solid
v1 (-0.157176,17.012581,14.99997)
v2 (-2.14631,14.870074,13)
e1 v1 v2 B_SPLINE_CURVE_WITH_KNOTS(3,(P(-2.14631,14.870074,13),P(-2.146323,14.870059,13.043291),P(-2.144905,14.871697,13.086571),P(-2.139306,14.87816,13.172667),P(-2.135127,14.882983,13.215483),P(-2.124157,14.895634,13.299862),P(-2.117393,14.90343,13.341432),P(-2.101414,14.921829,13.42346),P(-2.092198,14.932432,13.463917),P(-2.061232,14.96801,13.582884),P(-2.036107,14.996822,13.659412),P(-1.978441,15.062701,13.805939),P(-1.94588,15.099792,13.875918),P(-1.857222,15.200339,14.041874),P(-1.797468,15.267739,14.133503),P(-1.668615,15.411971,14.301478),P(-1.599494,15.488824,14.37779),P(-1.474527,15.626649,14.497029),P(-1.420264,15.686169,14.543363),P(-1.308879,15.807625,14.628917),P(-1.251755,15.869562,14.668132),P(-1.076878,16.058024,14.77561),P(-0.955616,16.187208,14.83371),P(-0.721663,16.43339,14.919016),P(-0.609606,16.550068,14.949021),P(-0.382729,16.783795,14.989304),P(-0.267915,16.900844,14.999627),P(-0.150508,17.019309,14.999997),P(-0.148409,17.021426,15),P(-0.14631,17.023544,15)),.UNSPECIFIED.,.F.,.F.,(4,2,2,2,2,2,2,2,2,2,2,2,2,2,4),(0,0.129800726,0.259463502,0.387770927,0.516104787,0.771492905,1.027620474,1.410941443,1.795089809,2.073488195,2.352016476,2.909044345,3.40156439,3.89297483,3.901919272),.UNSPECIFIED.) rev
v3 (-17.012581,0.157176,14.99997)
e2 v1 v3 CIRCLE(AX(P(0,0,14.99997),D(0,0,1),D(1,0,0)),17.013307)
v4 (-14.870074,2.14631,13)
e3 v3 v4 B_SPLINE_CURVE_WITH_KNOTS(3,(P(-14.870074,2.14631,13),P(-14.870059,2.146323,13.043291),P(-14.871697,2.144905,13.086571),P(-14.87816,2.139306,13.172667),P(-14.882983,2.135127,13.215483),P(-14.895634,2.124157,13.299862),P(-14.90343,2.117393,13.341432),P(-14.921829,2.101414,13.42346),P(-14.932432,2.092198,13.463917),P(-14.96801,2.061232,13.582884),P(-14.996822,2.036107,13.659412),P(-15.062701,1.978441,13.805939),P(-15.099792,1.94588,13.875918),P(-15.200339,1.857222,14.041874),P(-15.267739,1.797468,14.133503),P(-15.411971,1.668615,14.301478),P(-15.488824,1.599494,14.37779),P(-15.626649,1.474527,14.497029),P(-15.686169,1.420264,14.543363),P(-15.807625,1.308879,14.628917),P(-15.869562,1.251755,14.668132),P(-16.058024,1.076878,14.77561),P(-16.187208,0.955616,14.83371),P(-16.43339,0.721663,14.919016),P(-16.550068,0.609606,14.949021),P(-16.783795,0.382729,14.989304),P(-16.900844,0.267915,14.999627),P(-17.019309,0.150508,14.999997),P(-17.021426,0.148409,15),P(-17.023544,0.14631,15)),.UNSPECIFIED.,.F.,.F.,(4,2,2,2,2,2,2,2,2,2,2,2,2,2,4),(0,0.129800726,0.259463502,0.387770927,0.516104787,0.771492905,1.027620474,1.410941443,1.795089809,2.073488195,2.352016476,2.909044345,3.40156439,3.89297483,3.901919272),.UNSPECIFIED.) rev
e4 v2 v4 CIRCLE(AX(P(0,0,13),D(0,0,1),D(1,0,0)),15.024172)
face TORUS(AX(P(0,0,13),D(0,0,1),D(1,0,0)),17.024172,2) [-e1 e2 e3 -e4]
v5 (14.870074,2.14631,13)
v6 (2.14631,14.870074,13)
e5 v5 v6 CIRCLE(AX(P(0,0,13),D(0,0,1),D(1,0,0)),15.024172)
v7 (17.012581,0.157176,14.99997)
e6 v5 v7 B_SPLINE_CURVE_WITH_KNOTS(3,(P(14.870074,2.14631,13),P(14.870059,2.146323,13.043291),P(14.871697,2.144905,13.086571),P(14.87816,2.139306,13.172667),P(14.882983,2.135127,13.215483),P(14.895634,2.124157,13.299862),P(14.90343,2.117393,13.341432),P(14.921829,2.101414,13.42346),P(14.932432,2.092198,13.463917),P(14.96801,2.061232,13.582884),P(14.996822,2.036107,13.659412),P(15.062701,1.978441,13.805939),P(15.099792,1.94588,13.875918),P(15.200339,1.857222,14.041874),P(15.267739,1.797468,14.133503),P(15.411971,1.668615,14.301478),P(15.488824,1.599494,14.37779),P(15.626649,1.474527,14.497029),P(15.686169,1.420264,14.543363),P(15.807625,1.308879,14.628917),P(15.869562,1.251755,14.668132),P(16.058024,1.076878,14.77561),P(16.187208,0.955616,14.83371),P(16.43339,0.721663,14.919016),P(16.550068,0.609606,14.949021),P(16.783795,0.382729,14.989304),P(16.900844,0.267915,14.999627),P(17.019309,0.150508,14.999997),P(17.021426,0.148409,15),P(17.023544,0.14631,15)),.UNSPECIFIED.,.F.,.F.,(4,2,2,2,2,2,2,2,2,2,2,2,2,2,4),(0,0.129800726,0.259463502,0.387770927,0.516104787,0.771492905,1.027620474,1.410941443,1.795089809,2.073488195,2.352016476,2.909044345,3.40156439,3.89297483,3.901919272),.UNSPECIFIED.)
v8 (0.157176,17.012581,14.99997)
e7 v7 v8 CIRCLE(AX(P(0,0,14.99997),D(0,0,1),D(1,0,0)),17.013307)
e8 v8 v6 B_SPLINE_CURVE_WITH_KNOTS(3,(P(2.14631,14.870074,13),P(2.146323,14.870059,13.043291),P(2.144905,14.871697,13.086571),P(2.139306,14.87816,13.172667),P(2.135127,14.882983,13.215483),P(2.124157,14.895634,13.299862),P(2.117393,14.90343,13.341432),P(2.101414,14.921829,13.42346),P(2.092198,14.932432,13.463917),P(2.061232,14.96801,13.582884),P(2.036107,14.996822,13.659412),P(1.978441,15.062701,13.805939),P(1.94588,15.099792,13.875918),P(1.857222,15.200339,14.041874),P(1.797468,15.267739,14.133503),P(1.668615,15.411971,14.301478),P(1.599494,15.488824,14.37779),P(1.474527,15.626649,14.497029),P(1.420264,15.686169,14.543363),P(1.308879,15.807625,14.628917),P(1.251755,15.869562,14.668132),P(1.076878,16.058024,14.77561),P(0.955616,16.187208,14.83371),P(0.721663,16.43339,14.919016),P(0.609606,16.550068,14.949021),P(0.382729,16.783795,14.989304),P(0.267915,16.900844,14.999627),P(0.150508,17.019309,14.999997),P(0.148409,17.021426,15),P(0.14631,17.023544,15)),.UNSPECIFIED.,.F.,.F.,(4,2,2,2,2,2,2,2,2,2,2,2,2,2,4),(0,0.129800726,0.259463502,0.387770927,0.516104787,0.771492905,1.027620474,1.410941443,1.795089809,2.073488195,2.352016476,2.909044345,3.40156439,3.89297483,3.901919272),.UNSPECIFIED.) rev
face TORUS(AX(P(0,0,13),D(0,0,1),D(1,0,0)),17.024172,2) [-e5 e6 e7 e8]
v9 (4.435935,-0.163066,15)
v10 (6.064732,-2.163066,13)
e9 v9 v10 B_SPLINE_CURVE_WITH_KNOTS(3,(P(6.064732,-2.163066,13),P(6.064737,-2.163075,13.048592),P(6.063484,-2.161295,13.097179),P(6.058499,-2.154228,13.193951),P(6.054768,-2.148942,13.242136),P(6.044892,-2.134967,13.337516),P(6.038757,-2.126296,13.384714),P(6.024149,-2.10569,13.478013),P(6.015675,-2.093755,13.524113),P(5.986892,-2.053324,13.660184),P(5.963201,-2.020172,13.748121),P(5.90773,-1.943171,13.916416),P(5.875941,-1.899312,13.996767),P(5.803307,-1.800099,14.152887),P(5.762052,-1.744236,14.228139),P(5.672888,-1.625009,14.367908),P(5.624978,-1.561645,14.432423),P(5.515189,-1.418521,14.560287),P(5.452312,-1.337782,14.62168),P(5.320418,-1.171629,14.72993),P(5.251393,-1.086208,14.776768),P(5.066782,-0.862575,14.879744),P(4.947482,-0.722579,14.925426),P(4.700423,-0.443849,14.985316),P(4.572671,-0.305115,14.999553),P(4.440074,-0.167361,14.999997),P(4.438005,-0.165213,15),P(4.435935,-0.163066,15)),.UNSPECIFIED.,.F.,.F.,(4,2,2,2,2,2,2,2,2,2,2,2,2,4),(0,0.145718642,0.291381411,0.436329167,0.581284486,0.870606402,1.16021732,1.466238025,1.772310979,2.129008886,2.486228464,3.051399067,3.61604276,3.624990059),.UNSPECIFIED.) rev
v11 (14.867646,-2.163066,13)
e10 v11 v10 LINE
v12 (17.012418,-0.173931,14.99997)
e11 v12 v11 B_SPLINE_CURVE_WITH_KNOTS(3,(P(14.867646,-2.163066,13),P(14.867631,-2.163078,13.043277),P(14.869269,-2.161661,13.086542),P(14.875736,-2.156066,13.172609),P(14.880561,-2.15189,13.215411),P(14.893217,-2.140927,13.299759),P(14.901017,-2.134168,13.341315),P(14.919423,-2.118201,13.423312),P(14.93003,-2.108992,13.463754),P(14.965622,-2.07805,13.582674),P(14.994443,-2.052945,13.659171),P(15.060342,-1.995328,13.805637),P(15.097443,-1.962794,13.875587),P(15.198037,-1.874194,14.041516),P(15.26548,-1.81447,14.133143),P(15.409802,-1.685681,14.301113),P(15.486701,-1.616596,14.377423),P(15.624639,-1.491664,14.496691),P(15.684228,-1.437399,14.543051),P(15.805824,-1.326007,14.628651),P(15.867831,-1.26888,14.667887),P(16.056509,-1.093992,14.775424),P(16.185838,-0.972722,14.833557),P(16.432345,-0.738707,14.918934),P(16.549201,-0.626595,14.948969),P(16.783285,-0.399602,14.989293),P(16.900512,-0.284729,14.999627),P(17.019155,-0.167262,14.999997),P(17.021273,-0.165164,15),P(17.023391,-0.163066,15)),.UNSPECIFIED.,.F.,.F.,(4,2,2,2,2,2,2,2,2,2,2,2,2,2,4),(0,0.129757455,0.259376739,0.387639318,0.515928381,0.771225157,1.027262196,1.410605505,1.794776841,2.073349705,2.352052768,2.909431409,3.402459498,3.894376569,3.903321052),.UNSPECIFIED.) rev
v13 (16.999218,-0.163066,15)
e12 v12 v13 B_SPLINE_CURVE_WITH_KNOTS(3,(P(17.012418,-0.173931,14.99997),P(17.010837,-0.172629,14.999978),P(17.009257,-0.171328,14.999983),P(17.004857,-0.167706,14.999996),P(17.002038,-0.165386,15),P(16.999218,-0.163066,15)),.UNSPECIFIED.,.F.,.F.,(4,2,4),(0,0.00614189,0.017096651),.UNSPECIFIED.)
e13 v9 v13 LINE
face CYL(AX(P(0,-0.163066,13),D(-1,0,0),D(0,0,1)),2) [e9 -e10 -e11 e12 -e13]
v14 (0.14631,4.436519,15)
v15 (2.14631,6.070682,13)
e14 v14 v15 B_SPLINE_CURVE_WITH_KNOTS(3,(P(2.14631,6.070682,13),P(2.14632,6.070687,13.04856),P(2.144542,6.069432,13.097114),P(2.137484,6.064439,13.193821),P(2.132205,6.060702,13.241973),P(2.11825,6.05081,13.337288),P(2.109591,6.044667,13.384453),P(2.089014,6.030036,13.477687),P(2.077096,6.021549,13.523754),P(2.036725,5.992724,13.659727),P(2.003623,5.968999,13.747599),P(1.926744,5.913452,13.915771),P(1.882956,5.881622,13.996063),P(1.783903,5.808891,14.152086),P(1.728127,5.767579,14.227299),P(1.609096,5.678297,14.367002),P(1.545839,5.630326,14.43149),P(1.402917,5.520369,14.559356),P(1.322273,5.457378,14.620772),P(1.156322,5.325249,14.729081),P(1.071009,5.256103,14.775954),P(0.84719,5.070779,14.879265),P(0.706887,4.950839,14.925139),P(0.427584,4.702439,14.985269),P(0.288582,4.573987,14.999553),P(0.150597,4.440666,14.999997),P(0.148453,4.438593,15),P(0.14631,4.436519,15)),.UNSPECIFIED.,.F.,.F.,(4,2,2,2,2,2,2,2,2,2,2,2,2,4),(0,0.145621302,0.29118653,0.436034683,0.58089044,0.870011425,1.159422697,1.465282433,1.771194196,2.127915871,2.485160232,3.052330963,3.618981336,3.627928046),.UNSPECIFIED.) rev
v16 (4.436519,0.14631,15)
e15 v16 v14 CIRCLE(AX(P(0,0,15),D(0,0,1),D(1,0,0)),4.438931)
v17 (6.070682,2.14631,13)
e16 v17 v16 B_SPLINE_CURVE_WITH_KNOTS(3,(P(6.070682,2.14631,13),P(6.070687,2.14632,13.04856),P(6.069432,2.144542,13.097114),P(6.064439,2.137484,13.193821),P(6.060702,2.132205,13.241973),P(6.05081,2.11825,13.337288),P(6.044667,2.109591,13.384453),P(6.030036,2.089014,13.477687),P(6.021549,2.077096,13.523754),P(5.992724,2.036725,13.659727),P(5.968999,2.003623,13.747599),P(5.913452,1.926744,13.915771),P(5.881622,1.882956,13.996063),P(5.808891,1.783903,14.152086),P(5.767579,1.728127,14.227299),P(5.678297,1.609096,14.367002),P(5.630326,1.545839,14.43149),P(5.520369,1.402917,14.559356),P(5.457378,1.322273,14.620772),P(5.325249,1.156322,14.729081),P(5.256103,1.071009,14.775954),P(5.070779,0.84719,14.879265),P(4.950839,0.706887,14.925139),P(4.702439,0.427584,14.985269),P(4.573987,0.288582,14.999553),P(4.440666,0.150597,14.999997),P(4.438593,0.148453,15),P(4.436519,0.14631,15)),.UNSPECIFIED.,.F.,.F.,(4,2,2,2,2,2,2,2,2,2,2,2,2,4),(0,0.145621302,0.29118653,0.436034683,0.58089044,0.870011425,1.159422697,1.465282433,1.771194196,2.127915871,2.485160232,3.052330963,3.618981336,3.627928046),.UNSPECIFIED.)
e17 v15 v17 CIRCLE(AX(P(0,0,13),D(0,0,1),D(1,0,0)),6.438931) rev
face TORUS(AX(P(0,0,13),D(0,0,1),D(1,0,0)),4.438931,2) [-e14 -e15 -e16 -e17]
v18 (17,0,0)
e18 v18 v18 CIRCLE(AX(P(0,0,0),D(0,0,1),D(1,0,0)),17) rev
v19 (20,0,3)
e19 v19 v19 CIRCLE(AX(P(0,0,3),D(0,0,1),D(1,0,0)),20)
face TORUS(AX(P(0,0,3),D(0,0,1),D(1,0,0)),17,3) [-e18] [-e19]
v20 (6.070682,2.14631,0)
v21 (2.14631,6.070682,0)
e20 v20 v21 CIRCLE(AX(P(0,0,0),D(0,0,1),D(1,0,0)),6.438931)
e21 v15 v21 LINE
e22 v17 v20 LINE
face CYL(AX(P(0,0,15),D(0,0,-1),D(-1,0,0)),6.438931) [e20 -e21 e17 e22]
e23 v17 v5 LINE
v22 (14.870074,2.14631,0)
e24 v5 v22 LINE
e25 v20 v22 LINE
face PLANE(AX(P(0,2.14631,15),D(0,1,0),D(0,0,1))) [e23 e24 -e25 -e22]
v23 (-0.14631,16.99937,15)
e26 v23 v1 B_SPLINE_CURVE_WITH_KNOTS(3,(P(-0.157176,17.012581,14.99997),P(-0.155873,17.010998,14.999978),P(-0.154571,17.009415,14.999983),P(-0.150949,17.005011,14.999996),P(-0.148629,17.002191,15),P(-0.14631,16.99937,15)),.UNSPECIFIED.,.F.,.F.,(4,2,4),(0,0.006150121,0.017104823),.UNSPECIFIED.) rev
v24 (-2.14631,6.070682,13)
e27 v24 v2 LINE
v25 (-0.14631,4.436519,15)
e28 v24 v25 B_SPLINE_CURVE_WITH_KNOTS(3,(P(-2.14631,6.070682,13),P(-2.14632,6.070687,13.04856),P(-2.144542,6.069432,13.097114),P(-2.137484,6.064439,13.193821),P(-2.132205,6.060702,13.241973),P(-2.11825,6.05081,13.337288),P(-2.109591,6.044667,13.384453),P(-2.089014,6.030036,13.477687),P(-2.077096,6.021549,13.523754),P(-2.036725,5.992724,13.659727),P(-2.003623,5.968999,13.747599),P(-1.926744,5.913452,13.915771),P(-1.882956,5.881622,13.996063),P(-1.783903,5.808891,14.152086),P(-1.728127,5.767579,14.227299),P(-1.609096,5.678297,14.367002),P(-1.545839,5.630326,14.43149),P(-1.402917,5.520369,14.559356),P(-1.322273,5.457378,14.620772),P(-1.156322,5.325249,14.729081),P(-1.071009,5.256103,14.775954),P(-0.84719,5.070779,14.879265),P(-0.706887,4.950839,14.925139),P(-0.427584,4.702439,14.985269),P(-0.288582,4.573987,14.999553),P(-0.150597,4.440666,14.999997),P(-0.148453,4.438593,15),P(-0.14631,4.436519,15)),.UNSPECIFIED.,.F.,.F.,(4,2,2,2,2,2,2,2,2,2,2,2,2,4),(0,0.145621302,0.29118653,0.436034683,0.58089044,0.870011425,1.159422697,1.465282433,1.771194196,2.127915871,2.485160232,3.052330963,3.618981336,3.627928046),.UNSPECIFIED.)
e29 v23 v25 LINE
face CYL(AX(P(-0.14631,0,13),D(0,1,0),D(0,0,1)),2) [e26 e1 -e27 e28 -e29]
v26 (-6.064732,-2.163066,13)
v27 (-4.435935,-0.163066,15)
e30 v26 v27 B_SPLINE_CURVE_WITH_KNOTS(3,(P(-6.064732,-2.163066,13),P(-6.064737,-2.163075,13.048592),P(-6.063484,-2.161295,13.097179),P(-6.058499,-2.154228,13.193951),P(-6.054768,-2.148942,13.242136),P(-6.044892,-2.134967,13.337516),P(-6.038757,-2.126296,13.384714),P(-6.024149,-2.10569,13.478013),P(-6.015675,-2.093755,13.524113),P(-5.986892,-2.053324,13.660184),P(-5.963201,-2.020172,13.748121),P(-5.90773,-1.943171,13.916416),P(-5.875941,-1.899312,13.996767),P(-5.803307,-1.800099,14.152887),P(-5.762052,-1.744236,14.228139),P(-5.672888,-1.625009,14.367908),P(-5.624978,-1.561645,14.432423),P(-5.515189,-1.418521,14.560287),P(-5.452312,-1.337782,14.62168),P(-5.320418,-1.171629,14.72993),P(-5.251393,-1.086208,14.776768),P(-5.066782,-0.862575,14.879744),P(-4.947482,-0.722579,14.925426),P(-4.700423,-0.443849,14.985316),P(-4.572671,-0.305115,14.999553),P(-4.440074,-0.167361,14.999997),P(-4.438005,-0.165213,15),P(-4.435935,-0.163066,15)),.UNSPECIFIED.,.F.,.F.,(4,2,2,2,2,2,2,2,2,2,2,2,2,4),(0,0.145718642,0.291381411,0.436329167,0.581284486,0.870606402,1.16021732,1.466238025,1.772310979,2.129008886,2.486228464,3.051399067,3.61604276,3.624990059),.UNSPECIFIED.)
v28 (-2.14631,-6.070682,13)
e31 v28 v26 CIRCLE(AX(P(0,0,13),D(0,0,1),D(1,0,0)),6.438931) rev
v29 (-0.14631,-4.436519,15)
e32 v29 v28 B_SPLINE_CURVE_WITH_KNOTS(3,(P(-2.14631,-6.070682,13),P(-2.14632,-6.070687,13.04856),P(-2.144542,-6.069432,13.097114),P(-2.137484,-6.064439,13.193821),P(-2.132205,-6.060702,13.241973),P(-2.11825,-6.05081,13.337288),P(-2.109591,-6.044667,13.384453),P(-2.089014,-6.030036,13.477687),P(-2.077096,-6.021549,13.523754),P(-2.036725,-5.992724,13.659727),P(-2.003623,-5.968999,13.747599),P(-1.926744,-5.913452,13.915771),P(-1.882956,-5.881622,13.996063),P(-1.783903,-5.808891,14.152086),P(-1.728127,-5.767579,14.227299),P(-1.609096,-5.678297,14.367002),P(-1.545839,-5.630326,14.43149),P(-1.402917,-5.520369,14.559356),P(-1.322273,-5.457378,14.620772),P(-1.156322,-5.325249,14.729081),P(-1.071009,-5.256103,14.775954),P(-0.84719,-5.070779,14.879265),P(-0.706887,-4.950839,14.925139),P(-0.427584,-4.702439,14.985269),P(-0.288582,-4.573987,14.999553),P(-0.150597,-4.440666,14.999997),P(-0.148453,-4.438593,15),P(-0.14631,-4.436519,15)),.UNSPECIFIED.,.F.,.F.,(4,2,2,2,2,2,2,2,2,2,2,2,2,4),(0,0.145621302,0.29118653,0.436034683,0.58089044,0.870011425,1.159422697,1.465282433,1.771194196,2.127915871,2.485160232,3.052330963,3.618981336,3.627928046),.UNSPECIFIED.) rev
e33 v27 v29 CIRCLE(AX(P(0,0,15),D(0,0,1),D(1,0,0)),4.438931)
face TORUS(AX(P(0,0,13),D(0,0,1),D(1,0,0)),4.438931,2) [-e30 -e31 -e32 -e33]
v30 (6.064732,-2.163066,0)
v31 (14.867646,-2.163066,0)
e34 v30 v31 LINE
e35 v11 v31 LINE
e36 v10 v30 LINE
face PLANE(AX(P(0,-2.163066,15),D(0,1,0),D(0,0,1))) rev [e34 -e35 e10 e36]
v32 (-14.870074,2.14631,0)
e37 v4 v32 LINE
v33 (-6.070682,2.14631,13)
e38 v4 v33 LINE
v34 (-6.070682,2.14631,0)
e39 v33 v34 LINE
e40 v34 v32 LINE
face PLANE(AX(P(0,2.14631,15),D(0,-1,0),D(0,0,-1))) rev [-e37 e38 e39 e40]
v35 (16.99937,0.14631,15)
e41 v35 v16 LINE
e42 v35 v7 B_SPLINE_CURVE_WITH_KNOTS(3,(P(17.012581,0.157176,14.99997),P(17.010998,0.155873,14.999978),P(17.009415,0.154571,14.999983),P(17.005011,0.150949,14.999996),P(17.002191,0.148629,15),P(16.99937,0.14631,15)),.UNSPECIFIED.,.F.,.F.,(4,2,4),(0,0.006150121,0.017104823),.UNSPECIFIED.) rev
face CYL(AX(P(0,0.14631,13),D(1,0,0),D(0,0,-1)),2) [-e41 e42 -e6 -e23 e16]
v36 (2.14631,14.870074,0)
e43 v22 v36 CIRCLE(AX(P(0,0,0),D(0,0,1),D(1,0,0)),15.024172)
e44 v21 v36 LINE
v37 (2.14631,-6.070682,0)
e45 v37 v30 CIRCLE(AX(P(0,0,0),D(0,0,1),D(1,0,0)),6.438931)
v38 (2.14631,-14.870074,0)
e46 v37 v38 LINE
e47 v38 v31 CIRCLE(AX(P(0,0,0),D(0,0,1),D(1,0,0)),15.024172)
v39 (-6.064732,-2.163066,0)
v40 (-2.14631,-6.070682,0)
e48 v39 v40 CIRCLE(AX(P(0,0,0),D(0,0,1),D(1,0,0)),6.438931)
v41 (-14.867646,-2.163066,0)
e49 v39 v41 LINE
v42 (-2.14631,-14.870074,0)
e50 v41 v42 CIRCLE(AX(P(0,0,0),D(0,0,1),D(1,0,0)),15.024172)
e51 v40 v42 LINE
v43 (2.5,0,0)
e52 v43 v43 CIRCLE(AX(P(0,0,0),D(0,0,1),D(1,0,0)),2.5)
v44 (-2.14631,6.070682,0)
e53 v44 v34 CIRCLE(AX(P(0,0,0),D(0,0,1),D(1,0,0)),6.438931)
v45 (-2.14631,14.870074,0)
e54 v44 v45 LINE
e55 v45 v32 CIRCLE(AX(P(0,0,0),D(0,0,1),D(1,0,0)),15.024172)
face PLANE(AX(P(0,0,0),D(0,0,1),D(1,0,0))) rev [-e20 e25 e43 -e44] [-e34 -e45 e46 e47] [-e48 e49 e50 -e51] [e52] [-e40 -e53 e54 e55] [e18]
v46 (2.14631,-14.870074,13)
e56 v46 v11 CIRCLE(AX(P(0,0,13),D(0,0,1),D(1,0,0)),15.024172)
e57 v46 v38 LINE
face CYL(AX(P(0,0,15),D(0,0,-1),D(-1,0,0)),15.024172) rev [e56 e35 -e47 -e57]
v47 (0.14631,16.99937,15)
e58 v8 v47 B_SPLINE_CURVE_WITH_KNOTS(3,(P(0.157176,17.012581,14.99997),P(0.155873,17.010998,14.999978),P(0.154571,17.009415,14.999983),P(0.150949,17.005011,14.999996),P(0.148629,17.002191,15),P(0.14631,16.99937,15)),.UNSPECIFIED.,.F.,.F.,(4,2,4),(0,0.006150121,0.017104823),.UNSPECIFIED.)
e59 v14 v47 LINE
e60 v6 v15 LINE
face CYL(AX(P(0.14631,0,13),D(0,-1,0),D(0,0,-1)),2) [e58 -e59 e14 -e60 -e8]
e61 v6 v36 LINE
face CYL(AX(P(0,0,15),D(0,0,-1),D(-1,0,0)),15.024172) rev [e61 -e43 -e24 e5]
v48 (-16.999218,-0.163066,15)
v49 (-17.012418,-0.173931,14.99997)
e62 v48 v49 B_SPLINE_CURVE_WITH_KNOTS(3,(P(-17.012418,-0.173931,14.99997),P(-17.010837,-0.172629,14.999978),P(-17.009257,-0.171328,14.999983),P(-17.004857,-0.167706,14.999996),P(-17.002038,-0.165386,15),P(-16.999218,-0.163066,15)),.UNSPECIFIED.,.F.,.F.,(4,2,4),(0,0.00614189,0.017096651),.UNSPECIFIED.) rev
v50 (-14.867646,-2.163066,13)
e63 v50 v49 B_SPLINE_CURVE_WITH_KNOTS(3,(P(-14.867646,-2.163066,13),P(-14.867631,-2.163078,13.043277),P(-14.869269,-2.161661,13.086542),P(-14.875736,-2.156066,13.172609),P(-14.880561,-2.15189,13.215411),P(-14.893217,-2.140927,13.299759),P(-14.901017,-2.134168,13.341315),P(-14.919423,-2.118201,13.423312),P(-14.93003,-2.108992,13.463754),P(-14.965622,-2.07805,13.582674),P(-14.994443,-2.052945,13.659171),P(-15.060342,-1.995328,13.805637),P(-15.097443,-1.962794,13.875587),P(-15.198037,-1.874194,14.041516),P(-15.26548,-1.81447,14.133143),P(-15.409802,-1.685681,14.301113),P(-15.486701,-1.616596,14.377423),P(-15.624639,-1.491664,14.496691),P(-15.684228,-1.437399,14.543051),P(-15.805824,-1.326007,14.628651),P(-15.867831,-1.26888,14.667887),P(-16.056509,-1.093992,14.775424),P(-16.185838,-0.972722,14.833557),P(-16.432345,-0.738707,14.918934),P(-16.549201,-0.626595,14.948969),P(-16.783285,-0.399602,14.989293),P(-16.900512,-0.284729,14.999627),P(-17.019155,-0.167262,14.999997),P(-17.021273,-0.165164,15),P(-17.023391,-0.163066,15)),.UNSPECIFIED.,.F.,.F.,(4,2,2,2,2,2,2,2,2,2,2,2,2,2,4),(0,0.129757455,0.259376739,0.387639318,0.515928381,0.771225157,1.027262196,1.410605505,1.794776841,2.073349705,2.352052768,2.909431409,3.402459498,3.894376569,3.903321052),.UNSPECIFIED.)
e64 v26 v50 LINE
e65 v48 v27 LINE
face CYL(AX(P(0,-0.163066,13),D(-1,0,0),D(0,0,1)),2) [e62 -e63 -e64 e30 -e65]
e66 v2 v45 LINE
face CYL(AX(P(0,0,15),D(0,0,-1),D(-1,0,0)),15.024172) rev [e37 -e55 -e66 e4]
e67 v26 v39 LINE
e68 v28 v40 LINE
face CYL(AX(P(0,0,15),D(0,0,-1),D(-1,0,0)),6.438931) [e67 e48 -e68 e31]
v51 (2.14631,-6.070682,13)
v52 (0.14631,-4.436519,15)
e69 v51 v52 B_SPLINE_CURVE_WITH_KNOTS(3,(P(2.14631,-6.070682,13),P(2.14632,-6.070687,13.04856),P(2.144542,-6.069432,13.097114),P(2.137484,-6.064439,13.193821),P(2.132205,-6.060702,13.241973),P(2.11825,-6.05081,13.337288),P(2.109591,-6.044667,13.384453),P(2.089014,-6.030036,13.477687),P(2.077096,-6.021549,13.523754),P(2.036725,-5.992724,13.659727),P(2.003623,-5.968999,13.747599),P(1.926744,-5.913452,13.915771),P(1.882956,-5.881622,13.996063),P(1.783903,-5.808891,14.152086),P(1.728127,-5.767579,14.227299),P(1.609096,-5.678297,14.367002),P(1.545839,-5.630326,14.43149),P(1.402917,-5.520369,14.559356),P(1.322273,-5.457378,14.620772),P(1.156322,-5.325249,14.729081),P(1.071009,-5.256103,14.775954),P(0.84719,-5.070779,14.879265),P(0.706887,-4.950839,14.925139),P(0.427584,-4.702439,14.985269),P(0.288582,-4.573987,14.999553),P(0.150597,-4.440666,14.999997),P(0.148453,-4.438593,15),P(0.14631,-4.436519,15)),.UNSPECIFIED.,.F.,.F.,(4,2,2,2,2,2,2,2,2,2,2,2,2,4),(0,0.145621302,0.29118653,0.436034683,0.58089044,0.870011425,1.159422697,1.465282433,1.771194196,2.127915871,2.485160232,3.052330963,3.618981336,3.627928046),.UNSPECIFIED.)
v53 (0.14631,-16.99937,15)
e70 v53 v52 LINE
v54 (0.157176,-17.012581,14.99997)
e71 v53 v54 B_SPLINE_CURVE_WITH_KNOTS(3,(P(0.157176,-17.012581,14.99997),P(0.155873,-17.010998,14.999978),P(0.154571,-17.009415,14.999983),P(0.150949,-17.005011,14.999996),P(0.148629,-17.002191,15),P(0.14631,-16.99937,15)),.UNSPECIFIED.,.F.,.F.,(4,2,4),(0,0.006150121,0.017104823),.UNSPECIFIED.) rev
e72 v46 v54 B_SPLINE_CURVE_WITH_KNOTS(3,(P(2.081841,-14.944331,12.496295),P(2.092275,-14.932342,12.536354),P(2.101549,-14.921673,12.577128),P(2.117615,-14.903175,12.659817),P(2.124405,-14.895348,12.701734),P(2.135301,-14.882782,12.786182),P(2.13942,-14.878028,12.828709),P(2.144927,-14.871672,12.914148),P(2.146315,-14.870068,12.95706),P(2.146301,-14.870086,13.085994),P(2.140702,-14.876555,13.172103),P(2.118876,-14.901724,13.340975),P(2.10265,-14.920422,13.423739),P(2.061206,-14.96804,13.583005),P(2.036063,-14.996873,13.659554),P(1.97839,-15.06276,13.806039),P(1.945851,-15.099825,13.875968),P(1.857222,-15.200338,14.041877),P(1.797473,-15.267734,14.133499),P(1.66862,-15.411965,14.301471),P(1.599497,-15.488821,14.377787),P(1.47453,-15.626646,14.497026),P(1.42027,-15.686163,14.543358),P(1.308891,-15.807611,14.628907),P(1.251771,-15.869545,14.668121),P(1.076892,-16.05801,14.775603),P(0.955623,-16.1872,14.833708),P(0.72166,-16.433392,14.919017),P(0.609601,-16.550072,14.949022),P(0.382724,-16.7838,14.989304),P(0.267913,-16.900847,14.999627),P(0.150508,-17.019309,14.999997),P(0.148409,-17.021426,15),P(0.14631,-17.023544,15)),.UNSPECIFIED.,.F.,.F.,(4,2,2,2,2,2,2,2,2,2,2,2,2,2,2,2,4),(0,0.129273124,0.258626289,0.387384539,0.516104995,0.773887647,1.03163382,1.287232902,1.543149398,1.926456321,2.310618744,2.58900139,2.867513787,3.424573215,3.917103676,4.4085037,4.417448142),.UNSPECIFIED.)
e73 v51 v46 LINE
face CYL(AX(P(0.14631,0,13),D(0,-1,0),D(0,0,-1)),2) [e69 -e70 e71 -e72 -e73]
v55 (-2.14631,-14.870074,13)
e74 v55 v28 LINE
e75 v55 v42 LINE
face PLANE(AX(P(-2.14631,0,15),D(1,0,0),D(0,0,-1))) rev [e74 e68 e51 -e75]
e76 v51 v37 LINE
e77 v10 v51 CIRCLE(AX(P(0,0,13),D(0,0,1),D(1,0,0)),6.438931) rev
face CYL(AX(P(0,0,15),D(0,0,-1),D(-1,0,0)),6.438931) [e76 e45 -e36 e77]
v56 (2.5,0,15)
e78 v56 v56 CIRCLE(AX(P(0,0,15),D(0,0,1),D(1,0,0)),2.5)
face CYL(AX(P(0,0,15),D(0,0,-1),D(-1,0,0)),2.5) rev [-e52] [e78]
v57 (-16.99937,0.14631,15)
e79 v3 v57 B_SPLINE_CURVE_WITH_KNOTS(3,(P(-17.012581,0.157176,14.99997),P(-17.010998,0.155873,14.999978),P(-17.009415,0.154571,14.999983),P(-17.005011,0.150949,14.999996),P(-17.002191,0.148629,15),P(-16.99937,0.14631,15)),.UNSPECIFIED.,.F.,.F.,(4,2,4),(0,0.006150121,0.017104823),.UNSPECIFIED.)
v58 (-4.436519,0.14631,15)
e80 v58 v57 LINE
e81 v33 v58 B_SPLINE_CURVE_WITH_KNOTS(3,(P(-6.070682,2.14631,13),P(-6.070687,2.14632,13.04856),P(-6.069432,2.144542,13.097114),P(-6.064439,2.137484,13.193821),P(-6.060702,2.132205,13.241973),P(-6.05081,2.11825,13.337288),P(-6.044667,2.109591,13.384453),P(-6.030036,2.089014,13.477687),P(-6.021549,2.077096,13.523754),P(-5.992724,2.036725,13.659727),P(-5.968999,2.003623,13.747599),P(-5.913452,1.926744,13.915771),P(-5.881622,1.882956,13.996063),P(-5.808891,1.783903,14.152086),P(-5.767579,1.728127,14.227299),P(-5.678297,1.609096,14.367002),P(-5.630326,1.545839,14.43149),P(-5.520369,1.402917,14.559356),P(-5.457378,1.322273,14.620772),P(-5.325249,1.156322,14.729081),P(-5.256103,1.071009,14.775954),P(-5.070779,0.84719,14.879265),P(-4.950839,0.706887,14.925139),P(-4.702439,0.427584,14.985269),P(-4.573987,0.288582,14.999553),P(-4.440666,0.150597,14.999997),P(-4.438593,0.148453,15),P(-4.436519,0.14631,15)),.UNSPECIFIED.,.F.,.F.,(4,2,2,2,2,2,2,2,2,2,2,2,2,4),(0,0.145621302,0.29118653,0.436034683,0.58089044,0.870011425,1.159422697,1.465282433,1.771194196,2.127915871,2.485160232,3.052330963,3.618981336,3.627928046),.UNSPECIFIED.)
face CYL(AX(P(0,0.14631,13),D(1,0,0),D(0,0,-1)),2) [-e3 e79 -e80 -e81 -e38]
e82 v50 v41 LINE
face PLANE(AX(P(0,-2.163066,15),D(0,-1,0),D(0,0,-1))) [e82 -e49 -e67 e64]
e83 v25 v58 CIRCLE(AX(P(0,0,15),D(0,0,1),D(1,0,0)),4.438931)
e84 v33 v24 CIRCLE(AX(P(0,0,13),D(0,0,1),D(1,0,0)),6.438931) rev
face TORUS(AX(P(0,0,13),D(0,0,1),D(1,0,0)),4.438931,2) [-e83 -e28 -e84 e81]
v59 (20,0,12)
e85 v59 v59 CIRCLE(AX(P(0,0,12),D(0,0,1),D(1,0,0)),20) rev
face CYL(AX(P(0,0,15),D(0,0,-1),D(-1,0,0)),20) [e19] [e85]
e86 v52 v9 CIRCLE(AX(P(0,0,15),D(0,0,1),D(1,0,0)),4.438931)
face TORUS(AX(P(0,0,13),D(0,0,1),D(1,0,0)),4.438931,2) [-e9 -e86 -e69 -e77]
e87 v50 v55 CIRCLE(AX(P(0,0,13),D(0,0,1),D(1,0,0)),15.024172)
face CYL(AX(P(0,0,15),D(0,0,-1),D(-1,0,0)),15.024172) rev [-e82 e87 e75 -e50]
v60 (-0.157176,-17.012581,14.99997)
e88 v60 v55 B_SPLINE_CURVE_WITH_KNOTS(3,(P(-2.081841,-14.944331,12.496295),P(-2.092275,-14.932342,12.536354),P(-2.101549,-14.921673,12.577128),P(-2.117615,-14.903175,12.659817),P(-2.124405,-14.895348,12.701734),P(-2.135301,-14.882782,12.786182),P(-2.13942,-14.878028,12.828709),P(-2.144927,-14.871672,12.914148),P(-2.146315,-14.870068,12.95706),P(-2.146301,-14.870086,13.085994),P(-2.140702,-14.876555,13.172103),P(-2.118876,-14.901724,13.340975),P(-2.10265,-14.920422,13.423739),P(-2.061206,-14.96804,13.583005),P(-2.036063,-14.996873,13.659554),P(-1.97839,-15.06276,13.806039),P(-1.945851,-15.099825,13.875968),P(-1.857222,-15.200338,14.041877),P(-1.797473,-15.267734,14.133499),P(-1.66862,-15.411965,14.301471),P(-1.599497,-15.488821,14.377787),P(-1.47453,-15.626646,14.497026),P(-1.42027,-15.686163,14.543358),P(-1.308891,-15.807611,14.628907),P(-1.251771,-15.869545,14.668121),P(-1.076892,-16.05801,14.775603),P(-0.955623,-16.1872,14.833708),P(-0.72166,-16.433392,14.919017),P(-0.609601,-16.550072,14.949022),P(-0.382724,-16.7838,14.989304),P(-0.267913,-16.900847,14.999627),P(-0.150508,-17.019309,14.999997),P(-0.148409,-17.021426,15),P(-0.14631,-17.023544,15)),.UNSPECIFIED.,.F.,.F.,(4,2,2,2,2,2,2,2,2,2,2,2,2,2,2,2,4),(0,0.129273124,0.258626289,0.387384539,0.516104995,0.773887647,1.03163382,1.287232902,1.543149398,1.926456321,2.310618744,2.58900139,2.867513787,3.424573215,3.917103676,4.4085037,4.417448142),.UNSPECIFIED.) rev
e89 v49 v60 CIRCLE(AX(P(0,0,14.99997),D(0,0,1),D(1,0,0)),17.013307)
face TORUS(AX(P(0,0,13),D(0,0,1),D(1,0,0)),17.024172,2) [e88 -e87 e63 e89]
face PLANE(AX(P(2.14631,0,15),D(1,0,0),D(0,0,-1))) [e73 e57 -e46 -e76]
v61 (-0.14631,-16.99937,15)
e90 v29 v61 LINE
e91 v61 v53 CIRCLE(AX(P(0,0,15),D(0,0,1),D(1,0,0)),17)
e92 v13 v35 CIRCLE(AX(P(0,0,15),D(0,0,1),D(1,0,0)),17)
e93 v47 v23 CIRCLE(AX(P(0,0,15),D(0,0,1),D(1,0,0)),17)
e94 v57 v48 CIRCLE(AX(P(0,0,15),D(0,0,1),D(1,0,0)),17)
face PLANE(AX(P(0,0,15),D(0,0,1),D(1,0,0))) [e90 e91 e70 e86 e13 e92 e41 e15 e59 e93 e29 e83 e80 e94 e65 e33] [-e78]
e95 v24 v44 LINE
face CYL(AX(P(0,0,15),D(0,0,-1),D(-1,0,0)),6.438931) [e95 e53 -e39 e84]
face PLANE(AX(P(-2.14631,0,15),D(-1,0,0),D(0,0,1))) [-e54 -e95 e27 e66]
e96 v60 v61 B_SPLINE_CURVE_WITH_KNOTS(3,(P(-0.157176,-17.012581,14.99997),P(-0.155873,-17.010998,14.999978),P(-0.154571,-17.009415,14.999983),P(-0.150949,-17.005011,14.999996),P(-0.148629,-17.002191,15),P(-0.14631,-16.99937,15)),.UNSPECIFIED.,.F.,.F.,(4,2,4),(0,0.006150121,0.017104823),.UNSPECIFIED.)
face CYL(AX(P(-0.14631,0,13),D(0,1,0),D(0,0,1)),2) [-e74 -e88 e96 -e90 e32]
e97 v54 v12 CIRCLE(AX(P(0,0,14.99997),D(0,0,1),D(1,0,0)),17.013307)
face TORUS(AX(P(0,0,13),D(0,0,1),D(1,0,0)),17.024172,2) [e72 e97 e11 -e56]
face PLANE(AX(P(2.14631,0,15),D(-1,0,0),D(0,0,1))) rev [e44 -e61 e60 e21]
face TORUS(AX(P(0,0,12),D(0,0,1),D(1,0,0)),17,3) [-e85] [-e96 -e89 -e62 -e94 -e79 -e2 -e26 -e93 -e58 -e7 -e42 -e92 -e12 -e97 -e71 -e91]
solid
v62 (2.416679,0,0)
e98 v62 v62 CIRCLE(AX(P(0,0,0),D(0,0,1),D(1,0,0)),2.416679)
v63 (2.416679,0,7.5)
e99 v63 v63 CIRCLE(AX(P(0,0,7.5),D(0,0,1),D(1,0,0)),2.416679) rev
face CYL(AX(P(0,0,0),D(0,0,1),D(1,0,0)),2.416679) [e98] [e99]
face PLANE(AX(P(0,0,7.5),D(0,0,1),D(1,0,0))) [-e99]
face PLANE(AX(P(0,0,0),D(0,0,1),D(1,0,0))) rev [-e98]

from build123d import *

# Parameters (mm, degrees)
SKETCH2_R           = 20
SKETCH2_R_2         = 2.5
BOSS_EXTRUDE1_DEPTH = 15
SKETCH3_R           = 2.41667892
BOSS_EXTRUDE2_DEPTH = 15
FILLET2_R           = 2
FILLET3_R           = 3
SKETCH4_R           = 2.46809762
CUT_EXTRUDE1_DEPTH  = 7.5


with BuildPart() as part:
    # Sketch2 → Boss-Extrude1 (new body)
    with BuildSketch(Plane.XY):
        Circle(SKETCH2_R)
        Circle(SKETCH2_R_2, mode=Mode.SUBTRACT)
        with BuildLine():
            Line((-2.146310324, 6.070682338), (-2.146310324, 14.870074118))
            ThreePointArc((-2.146310324, 14.870074118), (-10.623694091, 10.623694091), (-14.870074118, 2.146310324))
            Line((-14.870074118, 2.146310324), (-6.070682338, 2.146310324))
            ThreePointArc((-6.070682338, 2.146310324), (-4.553011753, 4.553011753), (-2.146310324, 6.070682338))
        make_face(mode=Mode.SUBTRACT)
        with BuildLine():
            Line((2.146310324, 6.070682338), (2.146310324, 14.870074118))
            ThreePointArc((2.146310324, 14.870074118), (10.623694091, 10.623694091), (14.870074118, 2.146310324))
            Line((14.870074118, 2.146310324), (6.070682338, 2.146310324))
            ThreePointArc((6.070682338, 2.146310324), (4.553011753, 4.553011753), (2.146310324, 6.070682338))
        make_face(mode=Mode.SUBTRACT)
        with BuildLine():
            Line((6.064732431, -2.163065556), (14.867646071, -2.163065556))
            ThreePointArc((14.867646071, -2.163065556), (10.617706659, -10.629678151), (2.146310324, -14.870074118))
            Line((2.146310324, -14.870074118), (2.146310324, -6.070682338))
            ThreePointArc((2.146310324, -6.070682338), (4.546721127, -4.5592937), (6.064732431, -2.163065556))
        make_face(mode=Mode.SUBTRACT)
        with BuildLine():
            Line((-2.146310324, -6.070682338), (-2.146310324, -14.870074118))
            ThreePointArc((-2.146310324, -14.870074118), (-10.617706659, -10.629678151), (-14.867646071, -2.163065556))
            Line((-14.867646071, -2.163065556), (-6.064732431, -2.163065556))
            ThreePointArc((-6.064732431, -2.163065556), (-4.546721127, -4.5592937), (-2.146310324, -6.070682338))
        make_face(mode=Mode.SUBTRACT)
    extrude(amount=BOSS_EXTRUDE1_DEPTH)

    # Fillet2
    fillet2_edges = [part.edges().sort_by_distance(p)[0] for p in [
        (10.470378228, 2.146310324, 15),
        (-10.470378228, 2.146310324, 15),
        (-10.623694091, 10.623694091, 15),
        (-2.146310324, 10.470378228, 15),
        (4.553011753, 4.553011753, 15),
        (2.146310324, 10.470378228, 15),
        (10.623694091, 10.623694091, 15),
        (2.146310324, -10.470378228, 15),
        (4.546721127, -4.5592937, 15),
        (10.466189251, -2.163065556, 15),
        (10.617706659, -10.629678151, 15),
        (-10.466189251, -2.163065556, 15),
        (-4.546721127, -4.5592937, 15),
        (-2.146310324, -10.470378228, 15),
        (-10.617706659, -10.629678151, 15),
        (-4.553011753, 4.553011753, 15),
    ]]
    fillet(fillet2_edges, radius=FILLET2_R)

    # Fillet3
    # the kernel refuses this fillet: 3 mm, written as the material it takes off along each edge
    with BuildSketch(Plane(origin=(0, 0, 15), x_dir=(1, 0, 0), z_dir=(0, -1, 0))) as fillet3_piece_1:
        with BuildLine():
            CenterArc((20 - FILLET3_R, -FILLET3_R), FILLET3_R, 0, 90)
            Line((20, -FILLET3_R), (20 + FILLET3_R * 0.02, -FILLET3_R))
            Line((20 + FILLET3_R * 0.02, -FILLET3_R), (20 + FILLET3_R * 0.02, FILLET3_R * 0.02))
            Line((20 + FILLET3_R * 0.02, FILLET3_R * 0.02), (20 - FILLET3_R, FILLET3_R * 0.02))
            Line((20 - FILLET3_R, FILLET3_R * 0.02), (20 - FILLET3_R, 0))
        make_face()
    revolve(axis=Axis((0, 0, 15), (0, 0, 1)), mode=Mode.SUBTRACT)
    with BuildSketch(Plane(origin=(0, 0, 0), x_dir=(1, 0, 0), z_dir=(0, -1, 0))) as fillet3_piece_2:
        with BuildLine():
            CenterArc((20 - FILLET3_R, FILLET3_R), FILLET3_R, 270, 90)
            Line((20, FILLET3_R), (20 + FILLET3_R * 0.02, FILLET3_R))
            Line((20 + FILLET3_R * 0.02, FILLET3_R), (20 + FILLET3_R * 0.02, -FILLET3_R * 0.02))
            Line((20 + FILLET3_R * 0.02, -FILLET3_R * 0.02), (20 - FILLET3_R, -FILLET3_R * 0.02))
            Line((20 - FILLET3_R, -FILLET3_R * 0.02), (20 - FILLET3_R, 0))
        make_face()
    revolve(axis=Axis((0, 0, 0), (0, 0, 1)), mode=Mode.SUBTRACT)


with BuildPart() as body_2:
    # Sketch3 → Boss-Extrude2 (new body)
    with BuildSketch(Plane.XY.offset(15)):
        Circle(SKETCH3_R)
    extrude(amount=-BOSS_EXTRUDE2_DEPTH)

    # Sketch4 → Cut-Extrude1 (cut)
    with BuildSketch(Plane.XY.offset(15)):
        Circle(SKETCH4_R)
    extrude(amount=-CUT_EXTRUDE1_DEPTH, mode=Mode.SUBTRACT)


solid = Compound([part.part, body_2.part])
